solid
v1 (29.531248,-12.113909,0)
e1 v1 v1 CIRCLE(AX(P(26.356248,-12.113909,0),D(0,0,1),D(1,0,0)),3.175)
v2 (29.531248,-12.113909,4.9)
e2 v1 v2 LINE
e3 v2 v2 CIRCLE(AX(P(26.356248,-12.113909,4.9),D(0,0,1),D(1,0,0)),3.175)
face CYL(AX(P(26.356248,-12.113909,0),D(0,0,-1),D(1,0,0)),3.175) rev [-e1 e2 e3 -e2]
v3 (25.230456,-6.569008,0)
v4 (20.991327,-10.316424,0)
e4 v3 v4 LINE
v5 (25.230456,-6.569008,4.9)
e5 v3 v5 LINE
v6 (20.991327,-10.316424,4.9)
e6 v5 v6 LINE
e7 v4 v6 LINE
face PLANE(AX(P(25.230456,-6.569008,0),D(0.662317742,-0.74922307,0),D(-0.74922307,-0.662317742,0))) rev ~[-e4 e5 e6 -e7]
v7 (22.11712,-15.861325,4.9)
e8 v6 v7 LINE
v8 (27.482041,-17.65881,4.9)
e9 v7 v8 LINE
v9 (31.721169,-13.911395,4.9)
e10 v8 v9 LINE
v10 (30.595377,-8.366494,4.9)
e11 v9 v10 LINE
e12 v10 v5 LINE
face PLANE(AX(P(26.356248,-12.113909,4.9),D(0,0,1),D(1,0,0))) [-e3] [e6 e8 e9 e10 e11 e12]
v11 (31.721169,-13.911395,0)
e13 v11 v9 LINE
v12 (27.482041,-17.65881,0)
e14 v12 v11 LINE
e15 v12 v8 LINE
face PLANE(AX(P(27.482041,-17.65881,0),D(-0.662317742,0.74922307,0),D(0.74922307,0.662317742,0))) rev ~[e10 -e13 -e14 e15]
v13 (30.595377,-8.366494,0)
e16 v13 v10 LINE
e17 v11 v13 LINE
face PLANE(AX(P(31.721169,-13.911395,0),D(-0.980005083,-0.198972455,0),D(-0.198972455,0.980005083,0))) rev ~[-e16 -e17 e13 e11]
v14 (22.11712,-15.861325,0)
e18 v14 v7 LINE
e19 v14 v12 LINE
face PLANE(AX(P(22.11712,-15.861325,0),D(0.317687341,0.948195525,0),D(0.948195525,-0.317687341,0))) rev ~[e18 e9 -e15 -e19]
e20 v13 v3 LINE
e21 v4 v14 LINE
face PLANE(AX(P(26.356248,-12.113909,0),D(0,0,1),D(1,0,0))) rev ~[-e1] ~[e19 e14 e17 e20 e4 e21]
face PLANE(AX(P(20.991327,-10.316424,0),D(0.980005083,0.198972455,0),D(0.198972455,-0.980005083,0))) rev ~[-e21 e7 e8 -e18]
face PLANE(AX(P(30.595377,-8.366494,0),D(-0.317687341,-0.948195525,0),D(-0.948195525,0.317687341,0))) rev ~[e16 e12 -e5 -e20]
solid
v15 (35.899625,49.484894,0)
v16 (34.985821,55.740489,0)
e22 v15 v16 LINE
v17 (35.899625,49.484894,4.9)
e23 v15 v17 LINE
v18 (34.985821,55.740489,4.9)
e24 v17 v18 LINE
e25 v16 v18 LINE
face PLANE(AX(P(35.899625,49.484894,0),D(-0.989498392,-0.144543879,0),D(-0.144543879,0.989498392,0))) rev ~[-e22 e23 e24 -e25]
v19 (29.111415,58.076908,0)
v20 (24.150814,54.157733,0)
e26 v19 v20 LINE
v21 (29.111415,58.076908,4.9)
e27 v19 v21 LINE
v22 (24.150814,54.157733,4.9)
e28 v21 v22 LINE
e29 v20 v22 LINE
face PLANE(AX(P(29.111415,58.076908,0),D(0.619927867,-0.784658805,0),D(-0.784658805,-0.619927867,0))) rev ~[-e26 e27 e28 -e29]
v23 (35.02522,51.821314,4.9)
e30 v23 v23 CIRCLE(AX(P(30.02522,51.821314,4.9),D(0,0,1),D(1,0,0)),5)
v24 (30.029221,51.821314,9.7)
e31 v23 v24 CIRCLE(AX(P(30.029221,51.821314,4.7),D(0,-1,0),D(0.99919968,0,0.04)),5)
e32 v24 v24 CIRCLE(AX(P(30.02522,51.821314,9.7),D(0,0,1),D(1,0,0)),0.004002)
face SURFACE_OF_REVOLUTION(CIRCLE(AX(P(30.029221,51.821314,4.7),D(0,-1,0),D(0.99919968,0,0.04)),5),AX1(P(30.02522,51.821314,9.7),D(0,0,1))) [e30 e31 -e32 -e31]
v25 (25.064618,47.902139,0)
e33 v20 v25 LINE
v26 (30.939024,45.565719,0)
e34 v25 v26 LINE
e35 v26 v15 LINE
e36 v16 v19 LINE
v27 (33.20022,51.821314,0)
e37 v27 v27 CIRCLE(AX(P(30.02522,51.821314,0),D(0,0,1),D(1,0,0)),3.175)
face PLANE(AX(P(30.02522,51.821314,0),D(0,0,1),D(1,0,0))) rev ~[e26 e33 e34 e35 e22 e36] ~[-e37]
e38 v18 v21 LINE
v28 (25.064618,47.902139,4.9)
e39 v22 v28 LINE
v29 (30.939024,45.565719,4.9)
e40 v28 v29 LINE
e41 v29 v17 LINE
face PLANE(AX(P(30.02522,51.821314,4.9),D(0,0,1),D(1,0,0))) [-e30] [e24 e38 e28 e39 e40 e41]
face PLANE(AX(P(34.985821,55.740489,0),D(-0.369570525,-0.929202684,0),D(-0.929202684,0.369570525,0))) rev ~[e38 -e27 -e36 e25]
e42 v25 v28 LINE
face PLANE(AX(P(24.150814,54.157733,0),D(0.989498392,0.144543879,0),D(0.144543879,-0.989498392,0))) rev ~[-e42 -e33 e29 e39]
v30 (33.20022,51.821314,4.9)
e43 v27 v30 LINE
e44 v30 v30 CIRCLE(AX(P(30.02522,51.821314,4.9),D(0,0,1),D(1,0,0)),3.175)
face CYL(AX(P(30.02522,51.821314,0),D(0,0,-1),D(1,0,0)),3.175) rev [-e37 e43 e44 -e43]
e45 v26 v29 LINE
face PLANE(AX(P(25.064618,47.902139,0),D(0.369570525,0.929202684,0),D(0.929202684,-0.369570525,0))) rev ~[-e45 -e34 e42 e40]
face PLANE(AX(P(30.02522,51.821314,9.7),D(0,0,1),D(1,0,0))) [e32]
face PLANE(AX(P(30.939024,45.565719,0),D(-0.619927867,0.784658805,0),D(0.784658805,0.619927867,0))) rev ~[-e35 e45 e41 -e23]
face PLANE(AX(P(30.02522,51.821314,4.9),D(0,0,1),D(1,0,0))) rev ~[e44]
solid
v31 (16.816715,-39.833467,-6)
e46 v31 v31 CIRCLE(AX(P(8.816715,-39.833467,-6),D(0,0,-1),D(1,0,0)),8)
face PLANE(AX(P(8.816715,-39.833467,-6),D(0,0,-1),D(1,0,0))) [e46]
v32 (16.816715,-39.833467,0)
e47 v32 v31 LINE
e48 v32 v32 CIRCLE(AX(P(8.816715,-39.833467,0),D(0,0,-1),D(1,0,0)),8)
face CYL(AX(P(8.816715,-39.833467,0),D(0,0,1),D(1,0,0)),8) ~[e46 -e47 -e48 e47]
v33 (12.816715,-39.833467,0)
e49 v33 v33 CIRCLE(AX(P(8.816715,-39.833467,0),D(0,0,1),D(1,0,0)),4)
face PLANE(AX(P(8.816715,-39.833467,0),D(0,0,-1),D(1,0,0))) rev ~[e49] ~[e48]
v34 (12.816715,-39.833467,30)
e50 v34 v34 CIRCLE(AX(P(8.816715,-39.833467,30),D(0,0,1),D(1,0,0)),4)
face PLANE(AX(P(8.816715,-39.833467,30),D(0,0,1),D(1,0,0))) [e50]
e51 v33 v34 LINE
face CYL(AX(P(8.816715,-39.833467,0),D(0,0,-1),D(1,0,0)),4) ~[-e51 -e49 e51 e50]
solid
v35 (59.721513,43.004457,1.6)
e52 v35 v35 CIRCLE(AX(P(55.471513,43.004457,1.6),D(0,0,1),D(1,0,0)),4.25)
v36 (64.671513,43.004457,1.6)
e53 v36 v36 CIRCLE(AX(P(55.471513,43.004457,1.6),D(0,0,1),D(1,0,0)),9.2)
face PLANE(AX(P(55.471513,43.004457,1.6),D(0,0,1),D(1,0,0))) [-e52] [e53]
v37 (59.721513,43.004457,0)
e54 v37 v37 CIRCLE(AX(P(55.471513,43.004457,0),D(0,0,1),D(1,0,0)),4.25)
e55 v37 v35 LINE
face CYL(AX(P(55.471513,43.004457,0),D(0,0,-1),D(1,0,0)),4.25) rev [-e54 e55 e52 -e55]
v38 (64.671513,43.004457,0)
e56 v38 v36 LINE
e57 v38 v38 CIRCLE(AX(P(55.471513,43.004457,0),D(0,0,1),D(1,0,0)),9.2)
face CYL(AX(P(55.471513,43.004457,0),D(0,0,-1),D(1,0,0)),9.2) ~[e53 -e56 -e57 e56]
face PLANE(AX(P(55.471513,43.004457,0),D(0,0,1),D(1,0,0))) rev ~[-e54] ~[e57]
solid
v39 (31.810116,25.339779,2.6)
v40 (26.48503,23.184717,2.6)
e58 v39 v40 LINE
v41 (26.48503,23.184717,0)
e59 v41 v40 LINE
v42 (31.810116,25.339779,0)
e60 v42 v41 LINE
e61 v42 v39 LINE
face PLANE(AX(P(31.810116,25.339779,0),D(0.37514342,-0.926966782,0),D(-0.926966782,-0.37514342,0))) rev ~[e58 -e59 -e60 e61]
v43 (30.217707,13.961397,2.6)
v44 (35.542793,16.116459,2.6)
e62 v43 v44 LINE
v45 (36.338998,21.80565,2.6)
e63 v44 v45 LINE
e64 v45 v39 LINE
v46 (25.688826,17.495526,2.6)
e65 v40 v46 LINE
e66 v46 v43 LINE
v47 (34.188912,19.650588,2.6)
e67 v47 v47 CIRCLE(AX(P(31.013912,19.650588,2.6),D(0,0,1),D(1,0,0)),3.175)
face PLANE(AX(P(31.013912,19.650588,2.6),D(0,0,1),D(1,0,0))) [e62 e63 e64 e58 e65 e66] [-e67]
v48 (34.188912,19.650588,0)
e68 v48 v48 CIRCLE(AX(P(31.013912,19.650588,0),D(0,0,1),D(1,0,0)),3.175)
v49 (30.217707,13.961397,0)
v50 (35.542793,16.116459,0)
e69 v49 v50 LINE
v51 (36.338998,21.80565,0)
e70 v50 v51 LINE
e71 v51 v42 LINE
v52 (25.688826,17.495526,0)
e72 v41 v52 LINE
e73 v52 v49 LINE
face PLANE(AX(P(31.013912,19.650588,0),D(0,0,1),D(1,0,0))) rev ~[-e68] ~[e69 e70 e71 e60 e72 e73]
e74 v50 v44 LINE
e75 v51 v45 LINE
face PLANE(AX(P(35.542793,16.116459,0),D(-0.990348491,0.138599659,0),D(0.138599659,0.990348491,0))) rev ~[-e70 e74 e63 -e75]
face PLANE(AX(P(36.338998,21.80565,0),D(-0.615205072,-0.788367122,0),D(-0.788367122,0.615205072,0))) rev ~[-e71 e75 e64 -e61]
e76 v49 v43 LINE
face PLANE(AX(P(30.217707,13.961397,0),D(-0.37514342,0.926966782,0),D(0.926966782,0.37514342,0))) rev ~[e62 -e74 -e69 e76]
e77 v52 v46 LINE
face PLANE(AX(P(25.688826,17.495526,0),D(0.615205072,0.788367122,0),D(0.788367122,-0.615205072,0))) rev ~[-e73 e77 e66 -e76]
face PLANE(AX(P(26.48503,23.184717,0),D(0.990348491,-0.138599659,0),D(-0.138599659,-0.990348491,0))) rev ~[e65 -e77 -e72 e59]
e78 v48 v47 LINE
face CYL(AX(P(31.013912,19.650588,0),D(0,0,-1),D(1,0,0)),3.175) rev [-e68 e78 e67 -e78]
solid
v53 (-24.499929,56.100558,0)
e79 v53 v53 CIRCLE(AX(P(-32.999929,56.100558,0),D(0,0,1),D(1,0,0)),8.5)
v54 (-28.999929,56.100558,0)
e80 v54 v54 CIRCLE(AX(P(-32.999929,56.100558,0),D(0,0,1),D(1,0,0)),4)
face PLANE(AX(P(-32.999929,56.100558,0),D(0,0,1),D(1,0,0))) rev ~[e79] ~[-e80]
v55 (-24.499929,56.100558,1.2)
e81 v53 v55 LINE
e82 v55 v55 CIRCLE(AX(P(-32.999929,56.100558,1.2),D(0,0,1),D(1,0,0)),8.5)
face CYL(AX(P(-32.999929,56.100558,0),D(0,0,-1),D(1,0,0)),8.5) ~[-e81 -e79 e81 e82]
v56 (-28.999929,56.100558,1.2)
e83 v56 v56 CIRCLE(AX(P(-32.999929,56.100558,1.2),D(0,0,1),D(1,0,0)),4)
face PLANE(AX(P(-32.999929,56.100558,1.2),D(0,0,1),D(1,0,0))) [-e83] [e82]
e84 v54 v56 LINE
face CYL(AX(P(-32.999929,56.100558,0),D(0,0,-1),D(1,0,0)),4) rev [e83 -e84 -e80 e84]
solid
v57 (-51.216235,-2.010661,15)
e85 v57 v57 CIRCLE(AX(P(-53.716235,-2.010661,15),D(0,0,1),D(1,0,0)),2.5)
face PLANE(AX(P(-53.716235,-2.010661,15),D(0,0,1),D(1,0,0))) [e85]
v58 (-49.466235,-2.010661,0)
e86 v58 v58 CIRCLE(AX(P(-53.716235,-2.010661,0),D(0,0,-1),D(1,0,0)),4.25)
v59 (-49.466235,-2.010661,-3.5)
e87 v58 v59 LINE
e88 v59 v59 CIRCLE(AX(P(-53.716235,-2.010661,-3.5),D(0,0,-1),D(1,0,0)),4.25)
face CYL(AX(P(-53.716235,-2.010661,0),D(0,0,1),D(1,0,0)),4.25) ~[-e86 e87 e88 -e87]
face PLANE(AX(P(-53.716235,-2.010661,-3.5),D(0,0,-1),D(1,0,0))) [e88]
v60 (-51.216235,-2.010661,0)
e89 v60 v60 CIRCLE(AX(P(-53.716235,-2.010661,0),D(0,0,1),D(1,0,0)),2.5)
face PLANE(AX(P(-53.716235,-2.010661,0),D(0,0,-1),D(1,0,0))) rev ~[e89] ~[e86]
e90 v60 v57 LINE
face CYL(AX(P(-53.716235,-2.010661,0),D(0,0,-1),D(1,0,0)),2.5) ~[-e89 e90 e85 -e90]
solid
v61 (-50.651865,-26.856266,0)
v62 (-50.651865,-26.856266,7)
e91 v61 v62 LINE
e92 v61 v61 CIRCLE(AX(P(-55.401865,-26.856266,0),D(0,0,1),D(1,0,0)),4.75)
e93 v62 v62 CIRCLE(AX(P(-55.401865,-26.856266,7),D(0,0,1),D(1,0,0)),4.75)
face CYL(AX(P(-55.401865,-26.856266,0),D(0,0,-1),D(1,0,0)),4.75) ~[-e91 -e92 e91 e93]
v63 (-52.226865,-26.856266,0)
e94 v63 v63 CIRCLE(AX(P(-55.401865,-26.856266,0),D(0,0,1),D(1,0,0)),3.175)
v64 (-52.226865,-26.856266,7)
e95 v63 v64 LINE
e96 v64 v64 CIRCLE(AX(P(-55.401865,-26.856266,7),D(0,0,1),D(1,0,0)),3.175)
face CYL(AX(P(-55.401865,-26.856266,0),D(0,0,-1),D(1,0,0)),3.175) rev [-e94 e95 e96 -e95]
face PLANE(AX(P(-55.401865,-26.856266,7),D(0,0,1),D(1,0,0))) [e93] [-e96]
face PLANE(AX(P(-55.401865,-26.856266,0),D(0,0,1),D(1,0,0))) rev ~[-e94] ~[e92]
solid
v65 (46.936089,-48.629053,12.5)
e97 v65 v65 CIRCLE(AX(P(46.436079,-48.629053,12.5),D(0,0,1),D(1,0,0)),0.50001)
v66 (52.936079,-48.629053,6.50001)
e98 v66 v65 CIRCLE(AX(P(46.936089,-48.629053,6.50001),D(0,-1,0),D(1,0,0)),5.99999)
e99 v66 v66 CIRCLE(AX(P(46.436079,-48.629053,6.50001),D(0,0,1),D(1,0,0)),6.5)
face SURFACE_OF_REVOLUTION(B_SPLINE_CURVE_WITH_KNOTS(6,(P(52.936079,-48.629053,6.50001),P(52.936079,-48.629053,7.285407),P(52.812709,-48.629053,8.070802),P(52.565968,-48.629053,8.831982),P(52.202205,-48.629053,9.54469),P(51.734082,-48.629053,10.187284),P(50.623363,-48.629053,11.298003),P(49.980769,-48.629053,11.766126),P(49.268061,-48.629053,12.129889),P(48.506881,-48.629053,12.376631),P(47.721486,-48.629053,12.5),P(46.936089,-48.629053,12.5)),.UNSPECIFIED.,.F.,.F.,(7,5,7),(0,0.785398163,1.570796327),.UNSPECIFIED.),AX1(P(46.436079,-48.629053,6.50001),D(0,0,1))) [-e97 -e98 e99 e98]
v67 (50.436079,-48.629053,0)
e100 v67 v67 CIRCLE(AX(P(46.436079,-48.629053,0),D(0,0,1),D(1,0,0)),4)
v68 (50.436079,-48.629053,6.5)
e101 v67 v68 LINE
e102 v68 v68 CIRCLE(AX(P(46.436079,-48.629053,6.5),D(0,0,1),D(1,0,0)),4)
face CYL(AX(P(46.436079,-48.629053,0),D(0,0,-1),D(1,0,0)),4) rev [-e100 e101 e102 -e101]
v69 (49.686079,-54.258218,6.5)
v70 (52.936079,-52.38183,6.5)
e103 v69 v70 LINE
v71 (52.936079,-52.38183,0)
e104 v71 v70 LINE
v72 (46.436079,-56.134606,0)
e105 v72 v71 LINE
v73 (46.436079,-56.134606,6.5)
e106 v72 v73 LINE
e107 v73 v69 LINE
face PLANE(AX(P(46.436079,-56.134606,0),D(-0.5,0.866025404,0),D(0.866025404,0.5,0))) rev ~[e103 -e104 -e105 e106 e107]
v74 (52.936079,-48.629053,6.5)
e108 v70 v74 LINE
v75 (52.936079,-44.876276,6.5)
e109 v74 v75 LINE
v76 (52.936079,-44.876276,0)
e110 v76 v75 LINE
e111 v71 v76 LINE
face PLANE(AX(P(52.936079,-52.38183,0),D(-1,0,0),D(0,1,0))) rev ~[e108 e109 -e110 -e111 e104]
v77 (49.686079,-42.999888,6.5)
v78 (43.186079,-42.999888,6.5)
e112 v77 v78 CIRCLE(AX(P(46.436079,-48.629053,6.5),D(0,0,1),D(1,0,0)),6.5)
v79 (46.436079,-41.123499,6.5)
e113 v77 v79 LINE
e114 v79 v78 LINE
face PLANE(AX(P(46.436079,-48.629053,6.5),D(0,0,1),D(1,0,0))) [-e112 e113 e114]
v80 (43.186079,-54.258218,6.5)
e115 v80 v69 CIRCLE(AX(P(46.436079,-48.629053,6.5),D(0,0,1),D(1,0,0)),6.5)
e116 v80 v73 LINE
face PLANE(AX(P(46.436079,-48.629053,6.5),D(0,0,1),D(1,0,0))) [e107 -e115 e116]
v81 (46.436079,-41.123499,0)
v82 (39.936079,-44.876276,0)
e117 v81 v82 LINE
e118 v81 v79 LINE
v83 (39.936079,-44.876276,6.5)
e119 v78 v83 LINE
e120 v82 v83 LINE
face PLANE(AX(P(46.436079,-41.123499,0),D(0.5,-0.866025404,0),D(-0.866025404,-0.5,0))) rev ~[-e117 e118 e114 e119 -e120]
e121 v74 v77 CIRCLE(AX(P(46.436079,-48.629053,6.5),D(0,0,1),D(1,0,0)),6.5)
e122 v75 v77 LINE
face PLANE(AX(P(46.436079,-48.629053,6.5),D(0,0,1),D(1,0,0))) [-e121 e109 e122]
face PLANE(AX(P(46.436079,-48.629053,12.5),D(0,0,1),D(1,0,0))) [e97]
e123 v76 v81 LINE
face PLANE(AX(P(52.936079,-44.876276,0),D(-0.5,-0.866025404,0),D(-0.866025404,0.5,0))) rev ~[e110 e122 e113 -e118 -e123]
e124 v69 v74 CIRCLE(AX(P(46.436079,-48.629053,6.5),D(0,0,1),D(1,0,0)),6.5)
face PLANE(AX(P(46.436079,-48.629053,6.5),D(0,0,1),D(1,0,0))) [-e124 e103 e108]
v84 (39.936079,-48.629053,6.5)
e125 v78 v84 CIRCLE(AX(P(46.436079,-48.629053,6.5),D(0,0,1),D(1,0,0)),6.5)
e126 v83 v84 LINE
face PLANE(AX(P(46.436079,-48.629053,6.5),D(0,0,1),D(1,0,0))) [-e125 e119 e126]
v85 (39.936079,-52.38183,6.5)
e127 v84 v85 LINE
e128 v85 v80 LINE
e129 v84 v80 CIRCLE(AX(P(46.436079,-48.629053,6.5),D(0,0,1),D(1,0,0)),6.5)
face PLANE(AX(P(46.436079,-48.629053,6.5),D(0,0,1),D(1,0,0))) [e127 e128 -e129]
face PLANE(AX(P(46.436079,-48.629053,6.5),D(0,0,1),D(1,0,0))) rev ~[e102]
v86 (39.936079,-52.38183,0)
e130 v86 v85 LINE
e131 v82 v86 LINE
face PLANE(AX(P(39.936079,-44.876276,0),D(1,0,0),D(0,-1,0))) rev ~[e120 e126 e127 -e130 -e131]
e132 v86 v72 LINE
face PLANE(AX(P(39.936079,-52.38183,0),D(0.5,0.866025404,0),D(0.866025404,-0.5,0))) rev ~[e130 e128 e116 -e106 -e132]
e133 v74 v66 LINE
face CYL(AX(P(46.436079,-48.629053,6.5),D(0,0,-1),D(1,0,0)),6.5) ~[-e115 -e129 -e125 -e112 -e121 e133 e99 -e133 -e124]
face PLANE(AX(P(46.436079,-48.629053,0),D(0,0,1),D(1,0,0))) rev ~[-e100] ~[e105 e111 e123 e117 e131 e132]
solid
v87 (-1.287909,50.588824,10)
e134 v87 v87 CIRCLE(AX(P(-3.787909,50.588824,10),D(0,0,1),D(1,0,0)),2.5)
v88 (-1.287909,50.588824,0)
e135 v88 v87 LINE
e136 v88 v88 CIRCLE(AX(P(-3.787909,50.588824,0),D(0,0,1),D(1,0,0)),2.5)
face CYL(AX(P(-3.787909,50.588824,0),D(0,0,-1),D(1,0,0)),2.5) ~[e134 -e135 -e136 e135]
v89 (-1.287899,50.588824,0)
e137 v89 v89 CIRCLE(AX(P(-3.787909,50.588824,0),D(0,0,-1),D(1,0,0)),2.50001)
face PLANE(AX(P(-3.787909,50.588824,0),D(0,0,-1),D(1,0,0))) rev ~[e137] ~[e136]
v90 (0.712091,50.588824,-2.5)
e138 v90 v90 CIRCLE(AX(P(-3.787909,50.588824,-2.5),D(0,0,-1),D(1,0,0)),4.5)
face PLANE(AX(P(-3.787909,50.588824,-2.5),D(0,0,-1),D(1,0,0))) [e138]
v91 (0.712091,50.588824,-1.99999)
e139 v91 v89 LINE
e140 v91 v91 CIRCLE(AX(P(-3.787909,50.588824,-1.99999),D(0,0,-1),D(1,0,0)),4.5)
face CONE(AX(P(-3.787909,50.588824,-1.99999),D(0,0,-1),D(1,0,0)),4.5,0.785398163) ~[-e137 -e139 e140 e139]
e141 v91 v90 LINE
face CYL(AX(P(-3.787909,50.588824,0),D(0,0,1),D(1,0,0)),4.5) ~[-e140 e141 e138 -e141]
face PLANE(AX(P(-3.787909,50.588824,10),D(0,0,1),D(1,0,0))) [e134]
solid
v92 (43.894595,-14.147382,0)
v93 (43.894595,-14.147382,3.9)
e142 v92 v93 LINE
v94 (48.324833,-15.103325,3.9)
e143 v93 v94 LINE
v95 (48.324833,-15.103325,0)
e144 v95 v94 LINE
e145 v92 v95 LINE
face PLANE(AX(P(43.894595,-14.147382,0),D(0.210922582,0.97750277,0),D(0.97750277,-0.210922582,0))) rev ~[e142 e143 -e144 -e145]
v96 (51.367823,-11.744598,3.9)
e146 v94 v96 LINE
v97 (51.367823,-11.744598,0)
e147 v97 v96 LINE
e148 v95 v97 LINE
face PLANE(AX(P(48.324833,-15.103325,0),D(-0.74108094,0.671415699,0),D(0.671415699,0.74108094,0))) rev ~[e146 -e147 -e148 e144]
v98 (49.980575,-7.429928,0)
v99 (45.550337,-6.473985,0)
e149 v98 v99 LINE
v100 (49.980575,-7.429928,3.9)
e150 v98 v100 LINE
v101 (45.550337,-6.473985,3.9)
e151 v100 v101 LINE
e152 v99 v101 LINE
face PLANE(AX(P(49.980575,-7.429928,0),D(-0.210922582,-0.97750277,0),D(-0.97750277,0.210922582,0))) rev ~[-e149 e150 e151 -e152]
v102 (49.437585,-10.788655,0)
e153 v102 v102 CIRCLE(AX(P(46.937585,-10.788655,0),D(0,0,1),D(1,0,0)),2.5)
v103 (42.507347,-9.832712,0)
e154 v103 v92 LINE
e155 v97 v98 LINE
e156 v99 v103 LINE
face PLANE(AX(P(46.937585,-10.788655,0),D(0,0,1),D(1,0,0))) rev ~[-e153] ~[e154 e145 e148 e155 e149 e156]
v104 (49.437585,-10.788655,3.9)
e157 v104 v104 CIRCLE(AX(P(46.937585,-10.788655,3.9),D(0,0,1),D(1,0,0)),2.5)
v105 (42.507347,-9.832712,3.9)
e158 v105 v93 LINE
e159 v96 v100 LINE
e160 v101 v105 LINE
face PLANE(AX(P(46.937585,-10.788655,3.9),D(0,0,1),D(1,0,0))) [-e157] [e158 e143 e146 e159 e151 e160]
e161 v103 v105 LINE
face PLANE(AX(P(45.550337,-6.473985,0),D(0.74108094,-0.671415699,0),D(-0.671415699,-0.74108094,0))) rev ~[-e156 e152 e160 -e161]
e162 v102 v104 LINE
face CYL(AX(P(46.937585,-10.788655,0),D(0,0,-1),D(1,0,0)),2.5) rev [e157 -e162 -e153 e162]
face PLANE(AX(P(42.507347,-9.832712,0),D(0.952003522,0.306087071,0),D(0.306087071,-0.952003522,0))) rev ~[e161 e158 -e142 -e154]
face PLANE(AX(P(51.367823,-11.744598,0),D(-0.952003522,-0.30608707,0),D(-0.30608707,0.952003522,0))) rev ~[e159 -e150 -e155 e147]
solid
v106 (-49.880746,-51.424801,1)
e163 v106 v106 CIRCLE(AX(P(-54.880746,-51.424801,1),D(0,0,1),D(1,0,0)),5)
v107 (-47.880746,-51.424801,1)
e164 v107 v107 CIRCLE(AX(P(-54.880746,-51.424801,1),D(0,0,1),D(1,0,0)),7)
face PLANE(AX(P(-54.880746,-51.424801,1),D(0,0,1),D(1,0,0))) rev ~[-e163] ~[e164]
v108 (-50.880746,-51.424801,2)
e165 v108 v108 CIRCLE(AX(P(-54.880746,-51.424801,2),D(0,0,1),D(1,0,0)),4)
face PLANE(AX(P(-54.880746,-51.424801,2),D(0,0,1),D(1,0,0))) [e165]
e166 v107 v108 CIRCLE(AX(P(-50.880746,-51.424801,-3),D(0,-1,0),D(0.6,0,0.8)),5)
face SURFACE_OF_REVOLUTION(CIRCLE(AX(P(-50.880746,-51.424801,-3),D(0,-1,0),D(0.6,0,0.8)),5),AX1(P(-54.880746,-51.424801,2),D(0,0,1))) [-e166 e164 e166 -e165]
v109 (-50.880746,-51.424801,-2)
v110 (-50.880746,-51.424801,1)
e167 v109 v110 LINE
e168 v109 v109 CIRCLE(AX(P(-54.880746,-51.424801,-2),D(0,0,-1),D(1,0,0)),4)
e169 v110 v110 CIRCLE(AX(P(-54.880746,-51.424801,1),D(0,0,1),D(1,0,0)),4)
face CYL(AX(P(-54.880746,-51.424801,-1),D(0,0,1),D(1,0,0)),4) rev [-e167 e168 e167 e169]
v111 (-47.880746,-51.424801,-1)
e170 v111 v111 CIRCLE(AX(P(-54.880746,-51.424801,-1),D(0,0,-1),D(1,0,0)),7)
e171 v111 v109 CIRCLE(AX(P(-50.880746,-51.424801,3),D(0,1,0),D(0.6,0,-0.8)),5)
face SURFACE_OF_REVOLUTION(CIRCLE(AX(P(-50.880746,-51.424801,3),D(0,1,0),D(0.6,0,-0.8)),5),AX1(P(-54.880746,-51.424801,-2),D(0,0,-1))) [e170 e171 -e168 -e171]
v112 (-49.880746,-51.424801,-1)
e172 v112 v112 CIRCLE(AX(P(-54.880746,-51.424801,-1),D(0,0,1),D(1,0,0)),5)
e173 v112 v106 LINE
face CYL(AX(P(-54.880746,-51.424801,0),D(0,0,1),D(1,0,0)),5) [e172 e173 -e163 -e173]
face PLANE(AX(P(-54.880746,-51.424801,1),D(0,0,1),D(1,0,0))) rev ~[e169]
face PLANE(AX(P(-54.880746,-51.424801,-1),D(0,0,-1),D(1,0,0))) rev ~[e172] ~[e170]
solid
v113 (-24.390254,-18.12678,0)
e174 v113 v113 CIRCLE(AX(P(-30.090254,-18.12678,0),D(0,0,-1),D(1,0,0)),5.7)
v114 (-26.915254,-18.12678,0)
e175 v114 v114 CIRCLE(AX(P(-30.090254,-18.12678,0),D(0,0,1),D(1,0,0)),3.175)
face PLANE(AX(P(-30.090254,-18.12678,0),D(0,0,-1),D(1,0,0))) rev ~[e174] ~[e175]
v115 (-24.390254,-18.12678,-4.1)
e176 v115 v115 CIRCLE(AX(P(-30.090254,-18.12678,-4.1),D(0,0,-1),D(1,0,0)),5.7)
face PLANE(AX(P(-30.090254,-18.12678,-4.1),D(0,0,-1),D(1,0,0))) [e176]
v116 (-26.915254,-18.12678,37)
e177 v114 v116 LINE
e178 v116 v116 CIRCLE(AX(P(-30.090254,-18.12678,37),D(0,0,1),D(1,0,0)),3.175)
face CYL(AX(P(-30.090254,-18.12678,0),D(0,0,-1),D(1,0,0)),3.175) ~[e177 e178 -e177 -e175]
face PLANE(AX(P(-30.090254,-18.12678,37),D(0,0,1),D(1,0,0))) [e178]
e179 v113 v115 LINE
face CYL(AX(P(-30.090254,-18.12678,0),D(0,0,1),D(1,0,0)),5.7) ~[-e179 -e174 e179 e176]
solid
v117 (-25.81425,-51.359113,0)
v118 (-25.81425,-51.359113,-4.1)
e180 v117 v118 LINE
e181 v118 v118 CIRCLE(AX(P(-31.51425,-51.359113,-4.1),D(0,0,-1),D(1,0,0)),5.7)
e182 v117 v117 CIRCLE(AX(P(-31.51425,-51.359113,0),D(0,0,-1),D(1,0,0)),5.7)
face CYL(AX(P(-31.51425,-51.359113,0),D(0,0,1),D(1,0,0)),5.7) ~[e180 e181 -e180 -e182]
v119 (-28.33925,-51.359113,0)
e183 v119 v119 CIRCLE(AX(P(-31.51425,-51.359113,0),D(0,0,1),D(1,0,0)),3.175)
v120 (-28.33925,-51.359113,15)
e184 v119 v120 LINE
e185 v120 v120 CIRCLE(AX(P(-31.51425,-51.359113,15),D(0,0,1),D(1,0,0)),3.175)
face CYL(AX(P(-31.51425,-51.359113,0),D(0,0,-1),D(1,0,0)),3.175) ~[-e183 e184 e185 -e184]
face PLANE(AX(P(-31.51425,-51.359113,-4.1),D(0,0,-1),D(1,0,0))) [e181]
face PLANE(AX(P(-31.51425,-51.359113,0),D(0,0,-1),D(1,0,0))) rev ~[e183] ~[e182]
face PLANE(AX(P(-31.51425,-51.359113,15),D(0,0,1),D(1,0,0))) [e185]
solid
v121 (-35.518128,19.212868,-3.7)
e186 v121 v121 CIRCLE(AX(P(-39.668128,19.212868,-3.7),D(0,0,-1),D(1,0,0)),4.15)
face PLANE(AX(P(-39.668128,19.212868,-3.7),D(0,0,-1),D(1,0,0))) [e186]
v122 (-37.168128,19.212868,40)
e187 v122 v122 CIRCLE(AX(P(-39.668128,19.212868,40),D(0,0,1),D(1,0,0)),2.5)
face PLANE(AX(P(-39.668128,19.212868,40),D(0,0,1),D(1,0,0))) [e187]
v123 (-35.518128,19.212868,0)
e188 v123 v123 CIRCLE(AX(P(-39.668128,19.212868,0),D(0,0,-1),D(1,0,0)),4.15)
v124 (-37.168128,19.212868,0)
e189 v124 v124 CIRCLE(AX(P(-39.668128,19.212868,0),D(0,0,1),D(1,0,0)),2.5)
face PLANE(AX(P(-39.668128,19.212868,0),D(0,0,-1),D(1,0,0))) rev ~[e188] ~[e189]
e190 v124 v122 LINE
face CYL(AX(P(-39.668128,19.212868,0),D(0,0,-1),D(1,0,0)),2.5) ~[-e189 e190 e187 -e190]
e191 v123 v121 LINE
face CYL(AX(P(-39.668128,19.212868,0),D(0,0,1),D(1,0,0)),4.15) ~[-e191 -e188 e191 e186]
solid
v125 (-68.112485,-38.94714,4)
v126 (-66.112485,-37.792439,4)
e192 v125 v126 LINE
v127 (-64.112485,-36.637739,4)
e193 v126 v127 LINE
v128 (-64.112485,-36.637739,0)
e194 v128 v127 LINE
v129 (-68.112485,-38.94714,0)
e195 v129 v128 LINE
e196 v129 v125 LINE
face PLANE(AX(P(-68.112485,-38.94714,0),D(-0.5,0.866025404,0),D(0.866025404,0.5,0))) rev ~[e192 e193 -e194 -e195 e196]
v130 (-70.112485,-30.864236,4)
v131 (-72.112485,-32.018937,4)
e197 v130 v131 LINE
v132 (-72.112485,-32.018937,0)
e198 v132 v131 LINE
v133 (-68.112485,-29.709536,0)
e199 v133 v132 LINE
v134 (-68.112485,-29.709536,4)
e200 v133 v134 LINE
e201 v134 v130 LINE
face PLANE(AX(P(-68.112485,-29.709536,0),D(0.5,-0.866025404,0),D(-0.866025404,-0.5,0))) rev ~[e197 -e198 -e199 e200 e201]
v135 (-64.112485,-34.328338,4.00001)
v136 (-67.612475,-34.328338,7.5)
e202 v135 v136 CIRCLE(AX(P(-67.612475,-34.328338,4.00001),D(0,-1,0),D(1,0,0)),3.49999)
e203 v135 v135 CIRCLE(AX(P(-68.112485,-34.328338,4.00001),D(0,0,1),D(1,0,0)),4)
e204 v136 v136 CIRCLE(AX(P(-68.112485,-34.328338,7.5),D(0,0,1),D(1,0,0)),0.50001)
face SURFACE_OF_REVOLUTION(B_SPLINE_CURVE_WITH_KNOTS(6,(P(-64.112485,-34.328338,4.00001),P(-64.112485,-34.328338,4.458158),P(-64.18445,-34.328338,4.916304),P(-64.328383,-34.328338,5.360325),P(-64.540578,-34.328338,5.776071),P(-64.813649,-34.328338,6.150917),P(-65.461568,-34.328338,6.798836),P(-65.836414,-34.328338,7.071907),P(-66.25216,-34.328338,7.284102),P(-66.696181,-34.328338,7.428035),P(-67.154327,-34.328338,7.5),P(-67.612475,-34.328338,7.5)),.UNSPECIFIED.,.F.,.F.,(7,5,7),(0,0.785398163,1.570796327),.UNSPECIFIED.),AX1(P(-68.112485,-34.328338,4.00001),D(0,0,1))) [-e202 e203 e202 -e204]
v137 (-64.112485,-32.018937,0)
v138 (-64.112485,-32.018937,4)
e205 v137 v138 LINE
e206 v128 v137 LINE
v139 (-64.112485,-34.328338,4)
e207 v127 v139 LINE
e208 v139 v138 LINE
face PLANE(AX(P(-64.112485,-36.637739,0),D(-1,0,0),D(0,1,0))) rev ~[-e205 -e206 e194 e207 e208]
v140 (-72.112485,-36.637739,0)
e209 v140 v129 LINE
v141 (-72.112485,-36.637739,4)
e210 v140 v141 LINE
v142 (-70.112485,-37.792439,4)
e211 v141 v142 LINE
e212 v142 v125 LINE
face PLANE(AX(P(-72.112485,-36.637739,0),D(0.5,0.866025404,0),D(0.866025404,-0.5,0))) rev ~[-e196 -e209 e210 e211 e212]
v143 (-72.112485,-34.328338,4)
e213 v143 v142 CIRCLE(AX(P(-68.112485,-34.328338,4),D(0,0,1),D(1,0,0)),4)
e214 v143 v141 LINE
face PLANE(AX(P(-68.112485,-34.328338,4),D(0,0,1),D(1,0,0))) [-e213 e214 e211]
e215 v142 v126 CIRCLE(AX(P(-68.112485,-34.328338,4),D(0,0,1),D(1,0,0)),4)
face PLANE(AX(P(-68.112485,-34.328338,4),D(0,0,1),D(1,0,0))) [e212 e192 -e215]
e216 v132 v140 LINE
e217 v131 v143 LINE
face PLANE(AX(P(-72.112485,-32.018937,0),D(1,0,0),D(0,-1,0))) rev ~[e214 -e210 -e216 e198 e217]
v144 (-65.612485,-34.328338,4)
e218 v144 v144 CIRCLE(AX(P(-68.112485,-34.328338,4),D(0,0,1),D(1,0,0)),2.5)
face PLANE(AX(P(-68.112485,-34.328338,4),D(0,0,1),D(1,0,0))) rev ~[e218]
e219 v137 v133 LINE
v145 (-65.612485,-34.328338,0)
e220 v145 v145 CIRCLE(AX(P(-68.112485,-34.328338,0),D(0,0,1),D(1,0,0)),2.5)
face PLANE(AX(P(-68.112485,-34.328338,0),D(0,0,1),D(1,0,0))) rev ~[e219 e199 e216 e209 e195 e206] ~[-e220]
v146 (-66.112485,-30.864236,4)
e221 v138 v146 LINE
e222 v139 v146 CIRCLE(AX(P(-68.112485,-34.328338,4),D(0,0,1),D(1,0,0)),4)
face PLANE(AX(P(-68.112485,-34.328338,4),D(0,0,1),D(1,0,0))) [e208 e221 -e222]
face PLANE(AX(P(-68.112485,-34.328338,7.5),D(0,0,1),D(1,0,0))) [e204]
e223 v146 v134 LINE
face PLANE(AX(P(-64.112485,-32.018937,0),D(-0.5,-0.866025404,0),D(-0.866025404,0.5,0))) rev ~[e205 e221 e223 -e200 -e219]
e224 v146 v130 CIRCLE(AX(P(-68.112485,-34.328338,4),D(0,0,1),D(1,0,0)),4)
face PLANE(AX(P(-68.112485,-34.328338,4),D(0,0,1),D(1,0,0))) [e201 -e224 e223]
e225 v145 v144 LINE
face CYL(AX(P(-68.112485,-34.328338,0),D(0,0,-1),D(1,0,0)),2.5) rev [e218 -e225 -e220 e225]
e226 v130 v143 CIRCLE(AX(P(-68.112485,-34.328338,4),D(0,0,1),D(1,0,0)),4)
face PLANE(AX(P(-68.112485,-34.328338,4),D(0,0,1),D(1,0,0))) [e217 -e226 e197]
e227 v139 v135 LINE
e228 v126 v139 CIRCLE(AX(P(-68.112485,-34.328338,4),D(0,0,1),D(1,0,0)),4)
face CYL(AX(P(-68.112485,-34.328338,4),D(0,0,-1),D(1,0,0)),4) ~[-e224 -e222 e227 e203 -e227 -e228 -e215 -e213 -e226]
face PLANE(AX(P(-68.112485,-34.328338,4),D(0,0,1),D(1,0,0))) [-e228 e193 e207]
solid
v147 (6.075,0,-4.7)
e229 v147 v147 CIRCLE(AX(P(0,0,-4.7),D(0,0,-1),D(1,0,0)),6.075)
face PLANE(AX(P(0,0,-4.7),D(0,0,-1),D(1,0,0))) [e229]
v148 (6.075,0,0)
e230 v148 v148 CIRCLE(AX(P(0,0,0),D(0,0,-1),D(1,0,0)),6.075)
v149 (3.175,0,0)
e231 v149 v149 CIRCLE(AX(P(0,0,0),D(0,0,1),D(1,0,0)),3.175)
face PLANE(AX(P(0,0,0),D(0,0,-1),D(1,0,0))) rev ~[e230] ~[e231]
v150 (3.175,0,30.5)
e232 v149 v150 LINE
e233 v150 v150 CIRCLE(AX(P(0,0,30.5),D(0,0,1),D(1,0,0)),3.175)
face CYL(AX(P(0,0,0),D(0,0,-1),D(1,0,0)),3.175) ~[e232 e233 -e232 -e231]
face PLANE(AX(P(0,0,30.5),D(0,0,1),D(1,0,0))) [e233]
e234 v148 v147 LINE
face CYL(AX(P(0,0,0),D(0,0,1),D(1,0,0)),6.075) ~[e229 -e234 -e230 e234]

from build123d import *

# Parameters (mm, degrees)
F0_R      = 3.175
F1_DEPTH  = 30.5
F2_R      = 6.075
F3_DEPTH  = 4.7
F4_R      = 3.175
F5_DEPTH  = 4.9
F6_R      = 3.175
F7_DEPTH  = 37
F8_R      = 5.7
F9_DEPTH  = 4.1
F10_R     = 3.175
F11_DEPTH = 2.6
F12_R     = 2.5
F13_DEPTH = 3.9
F14_R     = 2.5
F15_DEPTH = 40
F16_R     = 4.15
F17_DEPTH = 3.7
F18_R     = 2.5
F19_DEPTH = 15
F20_R     = 4.25
F21_DEPTH = 3.5
F22_R     = 3.175
F23_DEPTH = 4.9
F24_R     = 5
F25_DEPTH = 4.8
F27_R     = 5
F27_R_2   = 4
F28_DEPTH = 1
F29_R     = 7
F30_DEPTH = 1
F32_R     = 7
F32_R_2   = 4
F33_DEPTH = 1
F35_R     = 4
F36_DEPTH = 30
F37_R     = 8
F38_DEPTH = 6
F39_R     = 4
F40_DEPTH = 6.5
F41_R     = 6.5
F42_DEPTH = 6
F43_R     = 5.99999
F44_R     = 8.5
F44_R_2   = 4
F45_DEPTH = 1.2
F46_R     = 4.75
F46_R_2   = 3.175
F47_DEPTH = 7
F48_R     = 3.175
F49_DEPTH = 15
F50_R     = 5.7
F51_DEPTH = 4.1
F52_R     = 9.2
F52_R_2   = 4.25
F53_DEPTH = 1.6
F54_R     = 2.5
F55_DEPTH = 4
F56_R     = 4
F57_DEPTH = 3.5
F58_R     = 3.49999
F59_R     = 2.5
F60_DEPTH = 10
F61_R     = 4.5
F62_DEPTH = 2.5
F63_SIZE  = 1.99999


# Not quite as in the source:
# - a fillet or chamfer that OpenCascade refuses, or shapes differently, is made with other operations: its cross-section is extruded or revolved along the edge and cut away or added
# - a fillet or chamfer is up to 0.001 mm smaller than in the source, because OpenCascade refuses the exact size


with BuildPart() as f1:
    # F0 (on Top) → F1 (new body)
    with BuildSketch(Plane.XY):
        Circle(F0_R)
    extrude(amount=F1_DEPTH)

    # F2 (on face) → F3 (join)
    with BuildSketch(Plane(origin=(0, 0, 0), x_dir=(1, 0, 0), z_dir=(0, 0, -1))):
        Circle(F2_R)
    extrude(amount=F3_DEPTH)


with BuildPart() as f5:
    # F4 (on Top) → F5 (new body)
    with BuildSketch(Plane.XY):
        Polygon((25.2304555405, -6.5690084936), (20.9913269575, -10.3164238949), (22.117119602, -15.8613246384), (27.4820408295, -17.6588099806), (31.7211694126, -13.9113945793), (30.5953767681, -8.3664938358), align=None)
        with Locations((26.356248185, -12.1139092371)):
            Circle(F4_R, mode=Mode.SUBTRACT)
    extrude(amount=F5_DEPTH)


with BuildPart() as f7:
    # F6 (on Top) → F7 (new body)
    with BuildSketch(Plane.XY):
        with Locations((-30.0902538002, -18.1267801672)):
            Circle(F6_R)
    extrude(amount=F7_DEPTH)

    # F8 (on face) → F9 (join)
    with BuildSketch(Plane(origin=(0, 0, 0), x_dir=(1, 0, 0), z_dir=(0, 0, -1))):
        with Locations((-30.0902538002, 18.1267801672)):
            Circle(F8_R)
    extrude(amount=F9_DEPTH)


with BuildPart() as f11:
    # F10 (on Top) → F11 (new body)
    with BuildSketch(Plane.XY):
        Polygon((36.3389975742, 21.8056498979), (31.810116069, 25.3397785947), (26.4850300848, 23.1847165088), (25.6888256057, 17.4955257262), (30.2177071109, 13.9613970295), (35.5427930952, 16.1164591153), align=None)
        with Locations((31.01391159, 19.6505878121)):
            Circle(F10_R, mode=Mode.SUBTRACT)
    extrude(amount=F11_DEPTH)


with BuildPart() as f13:
    # F12 (on Top) → F13 (new body)
    with BuildSketch(Plane.XY):
        Polygon((49.9805748483, -7.4299281605), (45.5503371745, -6.4739849159), (42.5073472032, -9.8327116639), (43.8945949057, -14.1473816565), (48.3248325795, -15.1033249012), (51.3678225508, -11.7445981532), align=None)
        with Locations((46.937584877, -10.7886549085)):
            Circle(F12_R, mode=Mode.SUBTRACT)
    extrude(amount=F13_DEPTH)


with BuildPart() as f15:
    # F14 (on Top) → F15 (new body)
    with BuildSketch(Plane.XY):
        with Locations((-39.6681278944, 19.2128680646)):
            Circle(F14_R)
    extrude(amount=F15_DEPTH)

    # F16 (on face) → F17 (join)
    with BuildSketch(Plane(origin=(0, 0, 0), x_dir=(1, 0, 0), z_dir=(0, 0, -1))):
        with Locations((-39.6681278944, -19.2128680646)):
            Circle(F16_R)
    extrude(amount=F17_DEPTH)


with BuildPart() as f19:
    # F18 (on Top) → F19 (new body)
    with BuildSketch(Plane.XY):
        with Locations((-53.7162348628, -2.0106609445)):
            Circle(F18_R)
    extrude(amount=F19_DEPTH)

    # F20 (on face) → F21 (join)
    with BuildSketch(Plane(origin=(0, 0, 0), x_dir=(1, 0, 0), z_dir=(0, 0, -1))):
        with Locations((-53.7162348628, 2.0106609445)):
            Circle(F20_R)
    extrude(amount=F21_DEPTH)


with BuildPart() as f23:
    # F22 (on Top) → F23 (new body)
    with BuildSketch(Plane.XY):
        Polygon((29.1114152461, 58.0769082309), (24.1508137011, 54.1577332779), (25.0646179998, 47.9021388454), (30.9390238435, 45.5657193659), (35.8996253884, 49.484894319), (34.9858210897, 55.7404887514), align=None)
        with Locations((30.0252195448, 51.8213137984)):
            Circle(F22_R, mode=Mode.SUBTRACT)
    extrude(amount=F23_DEPTH)

    # F24 (on face) → F25 (join)
    with BuildSketch(Plane.XY.offset(4.9)):
        with Locations((30.0252195448, 51.8213137984)):
            Circle(F24_R)
    extrude(amount=F25_DEPTH)

    # F26: fillet of radius 5 on 1 edges, made by hand

    # F26_s1 → F26_t2 (revolve, cut)
    with BuildSketch(Plane.XZ.offset(-51.8213137984)):
        with BuildLine():
            ThreePointArc((35.0252195448, 4.9), (33.4933227612, 8.3055512755), (30.029221146, 9.7))
            Line((30.029221146, 9.7), (35.0252195448, 9.7))
            Line((35.0252195448, 9.7), (35.0252195448, 4.9))
        make_face()
    revolve(axis=Axis((30.0252195448, 51.8213137984, 9.7), (0, 0, 1)), mode=Mode.SUBTRACT)


with BuildPart() as f28:
    # F27 (on Top) → F28 (new body, symmetric)
    with BuildSketch(Plane.XY):
        with Locations((-54.8807457089, -51.4248013496)):
            Circle(F27_R)
        with Locations((-54.8807457089, -51.4248013496)):
            Circle(F27_R_2, mode=Mode.SUBTRACT)
    extrude(amount=F28_DEPTH, both=True)

    # F29 (on face) → F30 (join)
    with BuildSketch(Plane.XY.offset(1)):
        with Locations((-54.8807457089, -51.4248013496)):
            Circle(F29_R)
    extrude(amount=F30_DEPTH)

    # F31: fillet of radius 5 on 1 edges, made by hand

    # F31_s1 → F31_t2 (revolve, cut)
    with BuildSketch(Plane.XZ.offset(51.4248013496)):
        with BuildLine():
            ThreePointArc((-47.8807457089, 1), (-49.2996068789, 1.7434164903), (-50.8807457089, 2))
            Line((-50.8807457089, 2), (-47.8807457089, 2))
            Line((-47.8807457089, 2), (-47.8807457089, 1))
        make_face()
    revolve(axis=Axis((-54.8807457089, -51.4248013496, 2), (0, 0, 1)), mode=Mode.SUBTRACT)

    # F32 (on face) → F33 (join)
    with BuildSketch(Plane(origin=(0, 0, -1), x_dir=(1, 0, 0), z_dir=(0, 0, -1))):
        with Locations((-54.8807457089, 51.4248013496)):
            Circle(F32_R)
        with Locations((-54.8807457089, 51.4248013496)):
            Circle(F32_R_2, mode=Mode.SUBTRACT)
    extrude(amount=F33_DEPTH)

    # F34: fillet of radius 5 on 1 edges, made by hand

    # F34_s1 → F34_t2 (revolve, cut)
    with BuildSketch(Plane.XZ.offset(51.4248013496)):
        with BuildLine():
            ThreePointArc((-47.8807457089, -1), (-49.2996068789, -1.7434164903), (-50.8807457089, -2))
            Line((-50.8807457089, -2), (-47.8807457089, -2))
            Line((-47.8807457089, -2), (-47.8807457089, -1))
        make_face()
    revolve(axis=Axis((-54.8807457089, -51.4248013496, -2), (0, 0, -1)), mode=Mode.SUBTRACT)


with BuildPart() as f36:
    # F35 (on Top) → F36 (new body)
    with BuildSketch(Plane.XY):
        with Locations((8.8167153299, -39.8334674537)):
            Circle(F35_R)
    extrude(amount=F36_DEPTH)

    # F37 (on face) → F38 (join)
    with BuildSketch(Plane(origin=(0, 0, 0), x_dir=(1, 0, 0), z_dir=(0, 0, -1))):
        with Locations((8.8167153299, 39.8334674537)):
            Circle(F37_R)
    extrude(amount=F38_DEPTH)


with BuildPart() as f40:
    # F39 (on Top) → F40 (new body)
    with BuildSketch(Plane.XY):
        Polygon((39.9360788465, -44.8762761873), (39.9360788465, -52.3818296868), (46.4360788465, -56.1346064365), (52.9360788465, -52.3818296868), (52.9360788465, -44.8762761873), (46.4360788465, -41.1234994376), align=None)
        with Locations((46.4360788465, -48.629052937)):
            Circle(F39_R, mode=Mode.SUBTRACT)
    extrude(amount=F40_DEPTH)

    # F41 (on face) → F42 (join)
    with BuildSketch(Plane.XY.offset(6.5)):
        with Locations((46.4360788465, -48.629052937)):
            Circle(F41_R)
    extrude(amount=F42_DEPTH)

    # F43 (radius 6 in the source; OpenCascade refuses exactly that, so slightly less here)
    f43_edges = [f40.edges().sort_by_distance(p)[0] for p in [
        (39.936079, -48.629053, 12.5),
    ]]
    fillet(f43_edges, radius=F43_R)


with BuildPart() as f45:
    # F44 (on Top) → F45 (new body)
    with BuildSketch(Plane.XY):
        with Locations((-32.9999290407, 56.1005584896)):
            Circle(F44_R)
        with Locations((-32.9999290407, 56.1005584896)):
            Circle(F44_R_2, mode=Mode.SUBTRACT)
    extrude(amount=F45_DEPTH)


with BuildPart() as f47:
    # F46 (on Top) → F47 (new body)
    with BuildSketch(Plane.XY):
        with Locations((-55.4018653929, -26.8562659621)):
            Circle(F46_R)
        with Locations((-55.4018653929, -26.8562659621)):
            Circle(F46_R_2, mode=Mode.SUBTRACT)
    extrude(amount=F47_DEPTH)


with BuildPart() as f49:
    # F48 (on Top) → F49 (new body)
    with BuildSketch(Plane.XY):
        with Locations((-31.514249742, -51.3591133058)):
            Circle(F48_R)
    extrude(amount=F49_DEPTH)

    # F50 (on face) → F51 (join)
    with BuildSketch(Plane(origin=(0, 0, 0), x_dir=(1, 0, 0), z_dir=(0, 0, -1))):
        with Locations((-31.514249742, 51.3591133058)):
            Circle(F50_R)
    extrude(amount=F51_DEPTH)


with BuildPart() as f53:
    # F52 (on Top) → F53 (new body)
    with BuildSketch(Plane.XY):
        with Locations((55.4715134203, 43.0044569075)):
            Circle(F52_R)
        with Locations((55.4715134203, 43.0044569075)):
            Circle(F52_R_2, mode=Mode.SUBTRACT)
    extrude(amount=F53_DEPTH)


with BuildPart() as f55:
    # F54 (on Top) → F55 (new body)
    with BuildSketch(Plane.XY):
        Polygon((-72.1124851108, -32.018936682), (-72.1124851108, -36.6377388355), (-68.1124851108, -38.9471399123), (-64.1124851108, -36.6377388355), (-64.1124851108, -32.018936682), (-68.1124851108, -29.7095356053), align=None)
        with Locations((-68.1124851108, -34.3283377588)):
            Circle(F54_R, mode=Mode.SUBTRACT)
    extrude(amount=F55_DEPTH)

    # F56 (on face) → F57 (join)
    with BuildSketch(Plane.XY.offset(4)):
        with Locations((-68.1124851108, -34.3283377588)):
            Circle(F56_R)
    extrude(amount=F57_DEPTH)

    # F58 (radius 3.5 in the source; OpenCascade refuses exactly that, so slightly less here)
    f58_edges = [f55.edges().sort_by_distance(p)[0] for p in [
        (-72.112485, -34.328338, 7.5),
    ]]
    fillet(f58_edges, radius=F58_R)


with BuildPart() as f60:
    # F59 (on Top) → F60 (new body)
    with BuildSketch(Plane.XY):
        with Locations((-3.7879089359, 50.5888238549)):
            Circle(F59_R)
    extrude(amount=F60_DEPTH)

    # F61 (on face) → F62 (join)
    with BuildSketch(Plane(origin=(0, 0, 0), x_dir=(1, 0, 0), z_dir=(0, 0, -1))):
        with Locations((-3.7879089359, -50.5888238549)):
            Circle(F61_R)
    extrude(amount=F62_DEPTH)

    # F63 (size 2 in the source; OpenCascade refuses exactly that, so slightly less here)
    f63_edges = [f60.edges().sort_by_distance(p)[0] for p in [
        (-8.287909, 50.588824, 0),
    ]]
    chamfer(f63_edges, length=F63_SIZE)


solid = Compound([f1.part, f5.part, f7.part, f11.part, f13.part, f15.part, f19.part, f23.part, f28.part, f36.part, f40.part, f45.part, f47.part, f49.part, f53.part, f55.part, f60.part])
